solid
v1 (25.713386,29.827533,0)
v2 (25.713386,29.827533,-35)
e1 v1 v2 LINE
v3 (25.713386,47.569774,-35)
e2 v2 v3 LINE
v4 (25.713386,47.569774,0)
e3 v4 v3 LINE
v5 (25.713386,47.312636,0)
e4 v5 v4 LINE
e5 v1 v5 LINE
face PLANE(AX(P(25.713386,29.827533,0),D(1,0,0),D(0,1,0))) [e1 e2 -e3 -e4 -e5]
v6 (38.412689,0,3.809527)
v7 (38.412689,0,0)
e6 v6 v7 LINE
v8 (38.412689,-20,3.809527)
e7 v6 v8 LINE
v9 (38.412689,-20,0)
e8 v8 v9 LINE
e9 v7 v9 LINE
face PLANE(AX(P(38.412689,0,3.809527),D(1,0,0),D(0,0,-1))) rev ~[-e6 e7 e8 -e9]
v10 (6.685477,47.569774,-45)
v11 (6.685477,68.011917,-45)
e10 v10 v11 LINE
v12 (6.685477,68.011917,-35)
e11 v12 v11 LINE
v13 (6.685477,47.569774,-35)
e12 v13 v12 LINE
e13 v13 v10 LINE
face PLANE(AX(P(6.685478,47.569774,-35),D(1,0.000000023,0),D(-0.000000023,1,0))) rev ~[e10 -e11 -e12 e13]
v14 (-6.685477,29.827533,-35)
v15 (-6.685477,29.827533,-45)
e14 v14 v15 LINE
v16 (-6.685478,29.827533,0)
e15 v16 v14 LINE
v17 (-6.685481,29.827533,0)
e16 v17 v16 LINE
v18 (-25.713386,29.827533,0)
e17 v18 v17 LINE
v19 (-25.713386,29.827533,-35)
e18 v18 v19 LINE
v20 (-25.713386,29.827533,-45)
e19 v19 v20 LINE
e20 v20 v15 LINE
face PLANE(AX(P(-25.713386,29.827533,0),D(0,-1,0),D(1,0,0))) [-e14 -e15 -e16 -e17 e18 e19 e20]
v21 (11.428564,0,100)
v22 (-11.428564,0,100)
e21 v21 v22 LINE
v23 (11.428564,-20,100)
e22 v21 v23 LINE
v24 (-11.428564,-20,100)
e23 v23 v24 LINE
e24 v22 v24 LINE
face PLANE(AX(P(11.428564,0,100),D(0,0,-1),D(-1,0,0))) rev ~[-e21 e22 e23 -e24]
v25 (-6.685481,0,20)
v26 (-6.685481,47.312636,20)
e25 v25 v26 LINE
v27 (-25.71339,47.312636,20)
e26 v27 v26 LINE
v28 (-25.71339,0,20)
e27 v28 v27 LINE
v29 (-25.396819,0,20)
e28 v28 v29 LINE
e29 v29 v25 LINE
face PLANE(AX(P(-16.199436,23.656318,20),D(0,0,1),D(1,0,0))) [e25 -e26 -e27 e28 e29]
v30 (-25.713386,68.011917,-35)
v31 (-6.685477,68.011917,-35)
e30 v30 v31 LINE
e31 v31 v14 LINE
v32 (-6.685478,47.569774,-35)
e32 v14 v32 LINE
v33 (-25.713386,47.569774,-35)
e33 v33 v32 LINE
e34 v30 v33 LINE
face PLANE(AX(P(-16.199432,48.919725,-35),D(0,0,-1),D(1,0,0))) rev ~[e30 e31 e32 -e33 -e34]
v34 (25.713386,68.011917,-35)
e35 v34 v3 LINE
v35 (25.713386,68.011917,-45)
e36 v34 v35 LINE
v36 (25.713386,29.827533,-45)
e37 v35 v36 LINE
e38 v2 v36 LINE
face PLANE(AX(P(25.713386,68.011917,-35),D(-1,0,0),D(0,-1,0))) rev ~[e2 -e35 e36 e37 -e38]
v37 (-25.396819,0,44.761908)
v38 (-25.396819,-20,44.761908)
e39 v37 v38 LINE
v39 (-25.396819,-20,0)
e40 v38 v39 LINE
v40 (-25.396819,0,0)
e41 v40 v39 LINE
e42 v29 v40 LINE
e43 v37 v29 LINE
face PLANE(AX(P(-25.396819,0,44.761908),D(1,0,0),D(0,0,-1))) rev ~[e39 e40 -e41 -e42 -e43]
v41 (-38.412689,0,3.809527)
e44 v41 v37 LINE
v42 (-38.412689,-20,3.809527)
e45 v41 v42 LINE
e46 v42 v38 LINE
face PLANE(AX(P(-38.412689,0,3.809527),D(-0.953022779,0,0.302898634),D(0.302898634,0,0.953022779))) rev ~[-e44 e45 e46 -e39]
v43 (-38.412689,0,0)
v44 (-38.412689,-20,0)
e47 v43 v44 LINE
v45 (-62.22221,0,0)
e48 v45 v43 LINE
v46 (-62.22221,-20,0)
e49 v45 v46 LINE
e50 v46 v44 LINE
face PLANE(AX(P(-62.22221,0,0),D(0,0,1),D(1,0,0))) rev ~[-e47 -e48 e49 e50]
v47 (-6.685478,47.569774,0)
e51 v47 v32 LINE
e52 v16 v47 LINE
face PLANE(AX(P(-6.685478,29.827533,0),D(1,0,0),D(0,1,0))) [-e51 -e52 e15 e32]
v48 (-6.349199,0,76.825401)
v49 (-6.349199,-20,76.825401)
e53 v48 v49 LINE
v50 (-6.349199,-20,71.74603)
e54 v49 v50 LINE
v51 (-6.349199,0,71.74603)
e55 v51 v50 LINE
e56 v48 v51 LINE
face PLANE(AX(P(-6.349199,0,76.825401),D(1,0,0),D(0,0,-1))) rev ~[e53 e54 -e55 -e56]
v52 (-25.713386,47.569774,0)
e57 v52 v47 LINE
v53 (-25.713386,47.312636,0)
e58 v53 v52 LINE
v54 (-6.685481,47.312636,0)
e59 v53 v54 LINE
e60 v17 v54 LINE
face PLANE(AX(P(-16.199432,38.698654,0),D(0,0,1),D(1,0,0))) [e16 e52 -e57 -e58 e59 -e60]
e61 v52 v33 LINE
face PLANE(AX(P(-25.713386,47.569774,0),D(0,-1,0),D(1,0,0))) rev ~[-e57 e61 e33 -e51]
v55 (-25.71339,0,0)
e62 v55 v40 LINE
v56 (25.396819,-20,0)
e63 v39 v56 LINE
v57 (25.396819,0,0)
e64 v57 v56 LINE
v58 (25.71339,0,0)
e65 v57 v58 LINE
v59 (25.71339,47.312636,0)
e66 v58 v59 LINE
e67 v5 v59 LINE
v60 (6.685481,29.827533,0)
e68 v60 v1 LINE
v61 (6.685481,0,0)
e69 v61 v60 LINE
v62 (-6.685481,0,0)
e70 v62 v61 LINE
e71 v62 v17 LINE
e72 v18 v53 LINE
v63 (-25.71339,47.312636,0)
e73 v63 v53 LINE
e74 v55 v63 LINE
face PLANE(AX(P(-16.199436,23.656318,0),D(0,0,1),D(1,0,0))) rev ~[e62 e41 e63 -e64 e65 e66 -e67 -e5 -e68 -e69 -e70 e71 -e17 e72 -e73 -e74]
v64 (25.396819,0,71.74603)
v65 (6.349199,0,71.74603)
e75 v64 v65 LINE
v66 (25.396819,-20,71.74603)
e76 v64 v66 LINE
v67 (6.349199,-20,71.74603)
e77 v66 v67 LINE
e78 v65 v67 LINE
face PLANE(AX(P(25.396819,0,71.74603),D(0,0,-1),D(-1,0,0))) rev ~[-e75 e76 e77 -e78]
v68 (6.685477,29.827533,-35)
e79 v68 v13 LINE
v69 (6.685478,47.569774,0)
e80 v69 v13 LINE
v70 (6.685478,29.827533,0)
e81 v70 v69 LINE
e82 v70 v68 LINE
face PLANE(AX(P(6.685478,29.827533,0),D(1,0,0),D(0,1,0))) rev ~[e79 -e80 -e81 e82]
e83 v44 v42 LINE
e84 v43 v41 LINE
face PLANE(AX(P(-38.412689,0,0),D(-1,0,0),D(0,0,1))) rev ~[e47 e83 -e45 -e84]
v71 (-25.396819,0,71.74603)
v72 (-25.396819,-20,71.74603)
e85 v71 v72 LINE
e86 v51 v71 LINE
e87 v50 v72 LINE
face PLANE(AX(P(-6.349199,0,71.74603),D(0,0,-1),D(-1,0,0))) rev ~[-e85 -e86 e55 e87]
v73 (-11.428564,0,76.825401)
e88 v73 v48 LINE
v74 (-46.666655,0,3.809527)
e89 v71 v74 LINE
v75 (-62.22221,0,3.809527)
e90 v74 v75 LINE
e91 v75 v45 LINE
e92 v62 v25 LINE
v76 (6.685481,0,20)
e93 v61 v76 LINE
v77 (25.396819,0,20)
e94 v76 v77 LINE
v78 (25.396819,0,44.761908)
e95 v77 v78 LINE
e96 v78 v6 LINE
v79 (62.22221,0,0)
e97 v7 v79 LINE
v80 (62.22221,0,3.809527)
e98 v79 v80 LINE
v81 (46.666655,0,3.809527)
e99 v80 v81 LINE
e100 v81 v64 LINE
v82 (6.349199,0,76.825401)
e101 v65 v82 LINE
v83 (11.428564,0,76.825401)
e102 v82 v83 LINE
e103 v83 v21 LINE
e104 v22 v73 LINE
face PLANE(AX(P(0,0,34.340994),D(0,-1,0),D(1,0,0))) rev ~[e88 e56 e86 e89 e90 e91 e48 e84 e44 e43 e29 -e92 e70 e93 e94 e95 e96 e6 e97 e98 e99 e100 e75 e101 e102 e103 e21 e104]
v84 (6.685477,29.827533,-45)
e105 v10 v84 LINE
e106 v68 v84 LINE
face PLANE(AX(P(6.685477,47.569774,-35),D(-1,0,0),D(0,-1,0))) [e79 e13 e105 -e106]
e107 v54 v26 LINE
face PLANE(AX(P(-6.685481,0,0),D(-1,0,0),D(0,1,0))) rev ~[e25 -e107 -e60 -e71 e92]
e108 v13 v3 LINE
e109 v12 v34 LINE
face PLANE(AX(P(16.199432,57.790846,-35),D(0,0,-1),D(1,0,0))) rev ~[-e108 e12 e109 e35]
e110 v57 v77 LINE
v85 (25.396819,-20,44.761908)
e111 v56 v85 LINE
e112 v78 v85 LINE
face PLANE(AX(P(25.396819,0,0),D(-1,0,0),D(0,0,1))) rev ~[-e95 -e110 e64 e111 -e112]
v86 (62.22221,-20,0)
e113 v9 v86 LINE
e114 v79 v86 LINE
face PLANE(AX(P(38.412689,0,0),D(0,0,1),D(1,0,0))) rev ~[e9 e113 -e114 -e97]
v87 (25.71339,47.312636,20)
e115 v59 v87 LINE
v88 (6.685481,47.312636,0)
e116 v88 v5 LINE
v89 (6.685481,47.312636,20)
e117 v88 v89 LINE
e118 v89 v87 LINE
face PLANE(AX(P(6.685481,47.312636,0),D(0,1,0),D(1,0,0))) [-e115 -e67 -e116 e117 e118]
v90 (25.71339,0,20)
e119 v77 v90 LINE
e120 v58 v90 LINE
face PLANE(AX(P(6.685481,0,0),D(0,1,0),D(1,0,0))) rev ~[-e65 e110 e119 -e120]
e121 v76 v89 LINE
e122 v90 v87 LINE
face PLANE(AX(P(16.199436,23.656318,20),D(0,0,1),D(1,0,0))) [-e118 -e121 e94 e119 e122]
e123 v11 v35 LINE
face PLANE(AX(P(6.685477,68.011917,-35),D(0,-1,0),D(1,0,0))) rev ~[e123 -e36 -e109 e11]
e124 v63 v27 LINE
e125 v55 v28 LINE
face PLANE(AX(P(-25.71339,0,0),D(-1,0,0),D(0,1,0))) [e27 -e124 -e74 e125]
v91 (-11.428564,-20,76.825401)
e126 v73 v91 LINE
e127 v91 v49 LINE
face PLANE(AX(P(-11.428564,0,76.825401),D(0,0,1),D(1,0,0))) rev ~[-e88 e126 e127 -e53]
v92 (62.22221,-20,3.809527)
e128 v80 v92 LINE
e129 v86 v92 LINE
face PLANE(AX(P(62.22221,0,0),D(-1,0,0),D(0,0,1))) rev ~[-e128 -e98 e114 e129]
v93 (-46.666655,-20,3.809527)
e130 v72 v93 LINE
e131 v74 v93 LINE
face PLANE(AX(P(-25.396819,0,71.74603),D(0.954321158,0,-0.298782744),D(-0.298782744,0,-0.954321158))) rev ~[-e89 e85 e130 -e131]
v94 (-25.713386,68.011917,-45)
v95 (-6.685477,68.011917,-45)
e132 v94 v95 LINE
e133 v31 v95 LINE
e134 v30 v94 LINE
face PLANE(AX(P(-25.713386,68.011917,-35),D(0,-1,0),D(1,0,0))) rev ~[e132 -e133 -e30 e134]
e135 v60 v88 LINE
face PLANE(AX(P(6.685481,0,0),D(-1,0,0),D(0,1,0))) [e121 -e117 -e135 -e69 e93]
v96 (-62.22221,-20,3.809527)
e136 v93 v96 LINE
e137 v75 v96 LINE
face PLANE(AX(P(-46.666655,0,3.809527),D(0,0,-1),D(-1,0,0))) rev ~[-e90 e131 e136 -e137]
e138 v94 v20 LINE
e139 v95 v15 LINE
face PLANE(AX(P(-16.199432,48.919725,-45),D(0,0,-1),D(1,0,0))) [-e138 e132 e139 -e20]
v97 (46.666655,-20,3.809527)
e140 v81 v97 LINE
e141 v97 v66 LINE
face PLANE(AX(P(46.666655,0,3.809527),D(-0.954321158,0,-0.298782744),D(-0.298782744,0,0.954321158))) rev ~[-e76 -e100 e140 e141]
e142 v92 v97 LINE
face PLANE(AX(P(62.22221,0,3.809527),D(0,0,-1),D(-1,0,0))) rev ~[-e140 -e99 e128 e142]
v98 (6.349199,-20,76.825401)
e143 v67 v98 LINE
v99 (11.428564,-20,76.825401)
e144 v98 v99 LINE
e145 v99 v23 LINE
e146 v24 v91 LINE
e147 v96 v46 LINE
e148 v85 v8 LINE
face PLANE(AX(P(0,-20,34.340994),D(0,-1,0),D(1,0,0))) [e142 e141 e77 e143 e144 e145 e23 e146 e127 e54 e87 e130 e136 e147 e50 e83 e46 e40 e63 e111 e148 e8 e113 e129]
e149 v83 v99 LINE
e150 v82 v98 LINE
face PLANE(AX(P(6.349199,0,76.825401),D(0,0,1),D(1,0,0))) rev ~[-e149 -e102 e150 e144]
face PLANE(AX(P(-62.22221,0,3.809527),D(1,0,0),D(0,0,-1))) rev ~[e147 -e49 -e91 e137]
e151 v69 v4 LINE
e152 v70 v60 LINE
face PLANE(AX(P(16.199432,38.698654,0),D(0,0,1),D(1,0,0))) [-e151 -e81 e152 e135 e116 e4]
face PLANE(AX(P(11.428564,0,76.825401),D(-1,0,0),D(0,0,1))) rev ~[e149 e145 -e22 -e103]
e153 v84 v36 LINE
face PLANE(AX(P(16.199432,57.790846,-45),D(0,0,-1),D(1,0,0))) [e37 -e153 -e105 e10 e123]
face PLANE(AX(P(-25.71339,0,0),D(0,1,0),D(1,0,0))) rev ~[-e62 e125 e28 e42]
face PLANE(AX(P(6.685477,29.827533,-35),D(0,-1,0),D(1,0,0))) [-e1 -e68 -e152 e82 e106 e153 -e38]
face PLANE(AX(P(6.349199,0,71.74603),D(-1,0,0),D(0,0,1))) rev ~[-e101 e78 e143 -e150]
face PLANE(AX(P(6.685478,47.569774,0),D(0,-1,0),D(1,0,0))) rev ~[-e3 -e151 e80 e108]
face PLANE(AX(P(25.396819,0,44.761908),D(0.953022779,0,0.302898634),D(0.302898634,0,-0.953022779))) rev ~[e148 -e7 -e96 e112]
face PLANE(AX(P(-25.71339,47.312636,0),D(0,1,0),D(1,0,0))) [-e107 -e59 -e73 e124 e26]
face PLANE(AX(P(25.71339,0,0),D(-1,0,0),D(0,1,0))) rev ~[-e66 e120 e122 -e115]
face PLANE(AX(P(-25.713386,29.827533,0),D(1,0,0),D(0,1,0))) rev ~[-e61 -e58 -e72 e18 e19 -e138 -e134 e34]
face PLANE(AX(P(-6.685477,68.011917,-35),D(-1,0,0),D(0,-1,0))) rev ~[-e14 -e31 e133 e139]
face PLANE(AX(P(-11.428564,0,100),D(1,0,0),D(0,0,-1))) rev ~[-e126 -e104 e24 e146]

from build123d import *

# Parameters (mm, degrees)
F1_DEPTH = 20
F2_W     = 19.0279083326
F2_H     = 47.3126359284
F3_DEPTH = 20
F4_W     = 19.0279083326
F4_H     = 17.7422408015
F5_DEPTH = 35
F6_W     = 19.0279087983
F6_H     = 38.1843838841
F6_H_2   = 17.7422408015
F7_DEPTH = 10


# Not quite as in the source:
# - ends of sketch curves that miss each other by under 0.0002 mm in the source are joined


with BuildPart() as f1:
    # F0 (on Front) → F1 (new body)
    with BuildSketch(Plane.XZ):
        Polygon((-6.3491990761, 71.7460297603), (-25.3968193009, 71.7460297603), (-46.6666553218, 3.8095274944), (-62.2222101619, 3.8095274944), (-62.2222101619, 0), (-38.4126887615, 0), (-38.4126887615, 3.8095274944), (-25.3968193009, 44.7619079595), (-25.3968193009, 0), (0, 0), (25.3968193009, 0), (25.3968193009, 44.7619079595), (38.4126887615, 3.8095274944), (38.4126887615, 0), (62.2222101619, 0), (62.2222101619, 3.8095274944), (46.6666553218, 3.8095274944), (25.3968193009, 71.7460297603), (6.3491990761, 71.7460297603), (6.3491990761, 76.8254005194), (11.4285635112, 76.8254005194), (11.4285635112, 100), (0, 100), (-11.4285635112, 100), (-11.4285635112, 76.8254005194), (-6.3491990761, 76.8254005194), align=None)
    extrude(amount=F1_DEPTH)

    # F2 (on Top) → F3 (join)
    with BuildSketch(Plane.XY):
        with Locations((-16.1994355731, 23.6563179642)):
            Rectangle(F2_W, F2_H)
        with Locations((16.1994355731, 23.6563179642)):
            Rectangle(F2_W, F2_H)
    extrude(amount=F3_DEPTH)

    # F4 (on Top) → F5 (join)
    with BuildSketch(Plane.XY):
        with Locations((16.1994318478, 38.6986536905)):
            Rectangle(F4_W, F4_H)
        with Locations((-16.1994318478, 38.6986536905)):
            Rectangle(F4_W, F4_H)
    extrude(amount=-F5_DEPTH)

    # F6 (on face) → F7 (join)
    with BuildSketch(Plane(origin=(0, 0, -35), x_dir=(1, 0, 0), z_dir=(0, 0, -1))):
        Polygon((25.7133860141, -68.0119171739), (25.7133860141, -47.5697740912), (6.6854776815, -47.5697740912), (6.6854772158, -68.0119171739), align=None)
        with Locations((-16.199431615, -48.9197252318)):
            Rectangle(F6_W, F6_H)
        with Locations((16.199431615, -38.6986536905)):
            Rectangle(F6_W, F6_H_2)
    extrude(amount=F7_DEPTH)


solid = f1.part
